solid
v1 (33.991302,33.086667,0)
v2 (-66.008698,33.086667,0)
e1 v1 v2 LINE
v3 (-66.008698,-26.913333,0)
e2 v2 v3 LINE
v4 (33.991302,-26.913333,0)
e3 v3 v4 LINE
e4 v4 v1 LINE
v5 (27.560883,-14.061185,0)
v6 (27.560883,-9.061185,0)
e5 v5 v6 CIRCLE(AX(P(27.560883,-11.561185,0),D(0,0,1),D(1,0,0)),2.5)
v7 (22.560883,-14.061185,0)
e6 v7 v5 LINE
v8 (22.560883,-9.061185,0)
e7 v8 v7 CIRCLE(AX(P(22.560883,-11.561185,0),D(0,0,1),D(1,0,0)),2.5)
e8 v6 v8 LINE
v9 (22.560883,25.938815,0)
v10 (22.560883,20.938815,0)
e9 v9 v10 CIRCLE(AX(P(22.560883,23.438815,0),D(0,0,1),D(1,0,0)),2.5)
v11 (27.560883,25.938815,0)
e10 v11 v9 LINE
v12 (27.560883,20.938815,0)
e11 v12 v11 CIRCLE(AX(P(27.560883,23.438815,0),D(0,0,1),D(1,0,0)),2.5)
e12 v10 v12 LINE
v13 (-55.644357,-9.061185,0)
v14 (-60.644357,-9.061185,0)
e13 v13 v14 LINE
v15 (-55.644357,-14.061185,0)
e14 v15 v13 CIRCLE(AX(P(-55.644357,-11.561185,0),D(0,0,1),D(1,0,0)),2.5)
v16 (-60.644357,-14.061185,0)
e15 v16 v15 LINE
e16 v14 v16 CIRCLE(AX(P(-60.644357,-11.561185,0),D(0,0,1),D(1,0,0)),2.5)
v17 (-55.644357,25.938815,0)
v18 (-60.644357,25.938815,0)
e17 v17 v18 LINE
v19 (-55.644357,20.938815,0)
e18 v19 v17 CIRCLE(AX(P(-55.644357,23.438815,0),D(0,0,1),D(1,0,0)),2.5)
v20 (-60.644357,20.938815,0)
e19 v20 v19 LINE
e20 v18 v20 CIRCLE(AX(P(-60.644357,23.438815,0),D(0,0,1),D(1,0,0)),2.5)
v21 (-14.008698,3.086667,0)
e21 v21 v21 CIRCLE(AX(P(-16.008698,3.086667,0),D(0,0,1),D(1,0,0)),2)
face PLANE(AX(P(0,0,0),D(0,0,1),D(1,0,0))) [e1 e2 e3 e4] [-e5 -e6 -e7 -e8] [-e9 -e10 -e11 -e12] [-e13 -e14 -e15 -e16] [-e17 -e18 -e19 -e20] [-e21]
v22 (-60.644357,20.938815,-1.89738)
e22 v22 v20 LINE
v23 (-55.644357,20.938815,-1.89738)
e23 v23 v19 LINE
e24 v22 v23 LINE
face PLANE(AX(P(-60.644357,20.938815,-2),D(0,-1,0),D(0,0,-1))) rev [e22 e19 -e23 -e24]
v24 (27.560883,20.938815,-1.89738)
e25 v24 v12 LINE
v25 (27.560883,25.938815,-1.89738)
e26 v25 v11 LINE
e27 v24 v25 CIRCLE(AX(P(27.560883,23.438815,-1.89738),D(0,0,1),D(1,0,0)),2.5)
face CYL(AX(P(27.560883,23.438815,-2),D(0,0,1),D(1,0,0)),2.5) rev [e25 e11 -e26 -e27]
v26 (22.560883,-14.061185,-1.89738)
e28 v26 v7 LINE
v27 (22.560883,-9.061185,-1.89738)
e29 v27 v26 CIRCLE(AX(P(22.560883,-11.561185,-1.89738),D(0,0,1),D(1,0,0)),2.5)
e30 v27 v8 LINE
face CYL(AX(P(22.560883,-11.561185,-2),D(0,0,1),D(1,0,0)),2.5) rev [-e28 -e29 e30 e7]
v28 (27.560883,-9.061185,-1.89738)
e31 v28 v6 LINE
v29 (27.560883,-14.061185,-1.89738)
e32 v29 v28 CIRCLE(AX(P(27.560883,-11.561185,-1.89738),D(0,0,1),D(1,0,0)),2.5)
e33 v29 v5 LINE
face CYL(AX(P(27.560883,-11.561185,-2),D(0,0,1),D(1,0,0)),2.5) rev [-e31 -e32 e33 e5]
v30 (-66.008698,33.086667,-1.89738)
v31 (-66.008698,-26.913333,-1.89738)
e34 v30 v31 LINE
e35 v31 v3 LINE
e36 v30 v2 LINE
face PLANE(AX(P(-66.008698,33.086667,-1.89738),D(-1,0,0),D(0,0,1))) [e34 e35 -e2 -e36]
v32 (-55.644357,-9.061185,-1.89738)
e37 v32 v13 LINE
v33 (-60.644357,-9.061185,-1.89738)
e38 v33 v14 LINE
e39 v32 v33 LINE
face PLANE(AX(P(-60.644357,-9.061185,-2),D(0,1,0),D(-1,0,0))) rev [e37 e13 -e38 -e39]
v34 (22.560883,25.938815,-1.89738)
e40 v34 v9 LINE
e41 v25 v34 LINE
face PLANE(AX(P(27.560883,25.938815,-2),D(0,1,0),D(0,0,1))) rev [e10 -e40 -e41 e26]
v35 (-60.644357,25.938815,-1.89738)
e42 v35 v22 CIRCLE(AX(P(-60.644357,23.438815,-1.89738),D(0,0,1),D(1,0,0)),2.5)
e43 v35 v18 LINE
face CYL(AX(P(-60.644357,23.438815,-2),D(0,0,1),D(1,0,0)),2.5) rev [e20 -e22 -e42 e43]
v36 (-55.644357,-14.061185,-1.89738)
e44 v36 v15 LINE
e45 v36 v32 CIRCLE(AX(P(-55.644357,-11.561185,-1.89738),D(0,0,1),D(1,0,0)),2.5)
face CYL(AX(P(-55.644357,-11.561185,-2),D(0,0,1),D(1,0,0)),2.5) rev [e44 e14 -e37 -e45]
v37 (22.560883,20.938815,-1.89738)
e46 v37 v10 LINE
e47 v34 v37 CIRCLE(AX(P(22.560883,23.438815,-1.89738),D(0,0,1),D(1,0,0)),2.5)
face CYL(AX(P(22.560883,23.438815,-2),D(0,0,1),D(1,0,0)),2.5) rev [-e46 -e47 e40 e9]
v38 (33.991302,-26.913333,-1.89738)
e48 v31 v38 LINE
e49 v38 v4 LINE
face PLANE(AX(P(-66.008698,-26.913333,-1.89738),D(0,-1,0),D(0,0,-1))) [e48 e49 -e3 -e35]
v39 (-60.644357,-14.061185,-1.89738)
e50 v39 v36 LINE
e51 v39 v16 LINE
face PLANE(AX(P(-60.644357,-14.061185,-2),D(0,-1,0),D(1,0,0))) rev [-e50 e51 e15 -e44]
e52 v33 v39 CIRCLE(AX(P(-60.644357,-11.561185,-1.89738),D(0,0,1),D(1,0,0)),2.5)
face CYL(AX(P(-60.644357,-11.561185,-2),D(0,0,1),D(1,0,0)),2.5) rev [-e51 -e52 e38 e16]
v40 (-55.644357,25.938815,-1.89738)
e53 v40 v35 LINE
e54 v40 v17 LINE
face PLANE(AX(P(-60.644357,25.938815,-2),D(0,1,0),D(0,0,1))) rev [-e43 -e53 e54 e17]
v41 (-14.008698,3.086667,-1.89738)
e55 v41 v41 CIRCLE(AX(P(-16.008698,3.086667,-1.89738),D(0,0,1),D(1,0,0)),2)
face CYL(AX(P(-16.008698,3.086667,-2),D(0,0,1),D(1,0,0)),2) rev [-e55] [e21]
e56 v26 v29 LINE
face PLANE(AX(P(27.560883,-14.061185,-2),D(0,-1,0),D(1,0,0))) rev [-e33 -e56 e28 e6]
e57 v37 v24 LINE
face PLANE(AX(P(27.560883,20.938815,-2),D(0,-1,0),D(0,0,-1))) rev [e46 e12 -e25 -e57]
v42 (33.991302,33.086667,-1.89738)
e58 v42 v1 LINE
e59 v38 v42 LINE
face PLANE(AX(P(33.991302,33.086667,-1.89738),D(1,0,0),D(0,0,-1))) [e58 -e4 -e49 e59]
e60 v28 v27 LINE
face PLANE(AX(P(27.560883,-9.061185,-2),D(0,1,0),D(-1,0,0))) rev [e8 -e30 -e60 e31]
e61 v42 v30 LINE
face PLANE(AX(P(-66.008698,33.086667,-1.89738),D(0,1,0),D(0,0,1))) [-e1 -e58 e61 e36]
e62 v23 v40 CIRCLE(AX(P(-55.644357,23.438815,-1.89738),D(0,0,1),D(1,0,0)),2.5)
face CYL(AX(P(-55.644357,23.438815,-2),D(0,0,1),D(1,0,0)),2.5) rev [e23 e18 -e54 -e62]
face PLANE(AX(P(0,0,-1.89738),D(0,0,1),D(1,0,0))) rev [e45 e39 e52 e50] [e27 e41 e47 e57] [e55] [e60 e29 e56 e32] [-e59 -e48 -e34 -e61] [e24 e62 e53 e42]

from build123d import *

# Parameters (mm, degrees)
SKETCH1_W          = 100
SKETCH1_H          = 60
BASE_FLANGE1_DEPTH = 1.89738
SKETCH7_R          = 2
CUT_EXTRUDE2_DEPTH = 2


# Sheet-metal steps are written as plain solids
with BuildPart() as part:
    # Sketch1 → Base-Flange1 (new body)
    with BuildSketch(Plane.XY):
        with Locations((-16.008698092, 3.086666862)):
            Rectangle(SKETCH1_W, SKETCH1_H)
    extrude(amount=-BASE_FLANGE1_DEPTH)

    # Sketch7 → Cut-Extrude2 (cut)
    with BuildSketch(Plane.XY):
        with Locations((-16.008698092, 3.086666862)):
            Circle(SKETCH7_R)
        with BuildLine():
            Line((-60.644357263, -9.061184979), (-55.644357263, -9.061184979))
            ThreePointArc((-55.644357263, -9.061184979), (-53.144357263, -11.561184979), (-55.644357263, -14.061184979))
            Line((-55.644357263, -14.061184979), (-60.644357263, -14.061184979))
            ThreePointArc((-60.644357263, -14.061184979), (-63.144357263, -11.561184979), (-60.644357263, -9.061184979))
        make_face()
        with BuildLine():
            Line((-60.644357263, 25.938815021), (-55.644357263, 25.938815021))
            ThreePointArc((-55.644357263, 25.938815021), (-53.144357263, 23.438815021), (-55.644357263, 20.938815021))
            Line((-55.644357263, 20.938815021), (-60.644357263, 20.938815021))
            ThreePointArc((-60.644357263, 20.938815021), (-63.144357263, 23.438815021), (-60.644357263, 25.938815021))
        make_face()
        with BuildLine():
            Line((27.560882737, 20.938815021), (22.560882737, 20.938815021))
            ThreePointArc((22.560882737, 20.938815021), (20.060882737, 23.438815021), (22.560882737, 25.938815021))
            Line((22.560882737, 25.938815021), (27.560882737, 25.938815021))
            ThreePointArc((27.560882737, 25.938815021), (30.060882737, 23.438815021), (27.560882737, 20.938815021))
        make_face()
        with BuildLine():
            Line((27.560882737, -14.061184979), (22.560882737, -14.061184979))
            ThreePointArc((22.560882737, -14.061184979), (20.060882737, -11.561184979), (22.560882737, -9.061184979))
            Line((22.560882737, -9.061184979), (27.560882737, -9.061184979))
            ThreePointArc((27.560882737, -9.061184979), (30.060882737, -11.561184979), (27.560882737, -14.061184979))
        make_face()
    extrude(amount=-CUT_EXTRUDE2_DEPTH, mode=Mode.SUBTRACT)


solid = part.part
